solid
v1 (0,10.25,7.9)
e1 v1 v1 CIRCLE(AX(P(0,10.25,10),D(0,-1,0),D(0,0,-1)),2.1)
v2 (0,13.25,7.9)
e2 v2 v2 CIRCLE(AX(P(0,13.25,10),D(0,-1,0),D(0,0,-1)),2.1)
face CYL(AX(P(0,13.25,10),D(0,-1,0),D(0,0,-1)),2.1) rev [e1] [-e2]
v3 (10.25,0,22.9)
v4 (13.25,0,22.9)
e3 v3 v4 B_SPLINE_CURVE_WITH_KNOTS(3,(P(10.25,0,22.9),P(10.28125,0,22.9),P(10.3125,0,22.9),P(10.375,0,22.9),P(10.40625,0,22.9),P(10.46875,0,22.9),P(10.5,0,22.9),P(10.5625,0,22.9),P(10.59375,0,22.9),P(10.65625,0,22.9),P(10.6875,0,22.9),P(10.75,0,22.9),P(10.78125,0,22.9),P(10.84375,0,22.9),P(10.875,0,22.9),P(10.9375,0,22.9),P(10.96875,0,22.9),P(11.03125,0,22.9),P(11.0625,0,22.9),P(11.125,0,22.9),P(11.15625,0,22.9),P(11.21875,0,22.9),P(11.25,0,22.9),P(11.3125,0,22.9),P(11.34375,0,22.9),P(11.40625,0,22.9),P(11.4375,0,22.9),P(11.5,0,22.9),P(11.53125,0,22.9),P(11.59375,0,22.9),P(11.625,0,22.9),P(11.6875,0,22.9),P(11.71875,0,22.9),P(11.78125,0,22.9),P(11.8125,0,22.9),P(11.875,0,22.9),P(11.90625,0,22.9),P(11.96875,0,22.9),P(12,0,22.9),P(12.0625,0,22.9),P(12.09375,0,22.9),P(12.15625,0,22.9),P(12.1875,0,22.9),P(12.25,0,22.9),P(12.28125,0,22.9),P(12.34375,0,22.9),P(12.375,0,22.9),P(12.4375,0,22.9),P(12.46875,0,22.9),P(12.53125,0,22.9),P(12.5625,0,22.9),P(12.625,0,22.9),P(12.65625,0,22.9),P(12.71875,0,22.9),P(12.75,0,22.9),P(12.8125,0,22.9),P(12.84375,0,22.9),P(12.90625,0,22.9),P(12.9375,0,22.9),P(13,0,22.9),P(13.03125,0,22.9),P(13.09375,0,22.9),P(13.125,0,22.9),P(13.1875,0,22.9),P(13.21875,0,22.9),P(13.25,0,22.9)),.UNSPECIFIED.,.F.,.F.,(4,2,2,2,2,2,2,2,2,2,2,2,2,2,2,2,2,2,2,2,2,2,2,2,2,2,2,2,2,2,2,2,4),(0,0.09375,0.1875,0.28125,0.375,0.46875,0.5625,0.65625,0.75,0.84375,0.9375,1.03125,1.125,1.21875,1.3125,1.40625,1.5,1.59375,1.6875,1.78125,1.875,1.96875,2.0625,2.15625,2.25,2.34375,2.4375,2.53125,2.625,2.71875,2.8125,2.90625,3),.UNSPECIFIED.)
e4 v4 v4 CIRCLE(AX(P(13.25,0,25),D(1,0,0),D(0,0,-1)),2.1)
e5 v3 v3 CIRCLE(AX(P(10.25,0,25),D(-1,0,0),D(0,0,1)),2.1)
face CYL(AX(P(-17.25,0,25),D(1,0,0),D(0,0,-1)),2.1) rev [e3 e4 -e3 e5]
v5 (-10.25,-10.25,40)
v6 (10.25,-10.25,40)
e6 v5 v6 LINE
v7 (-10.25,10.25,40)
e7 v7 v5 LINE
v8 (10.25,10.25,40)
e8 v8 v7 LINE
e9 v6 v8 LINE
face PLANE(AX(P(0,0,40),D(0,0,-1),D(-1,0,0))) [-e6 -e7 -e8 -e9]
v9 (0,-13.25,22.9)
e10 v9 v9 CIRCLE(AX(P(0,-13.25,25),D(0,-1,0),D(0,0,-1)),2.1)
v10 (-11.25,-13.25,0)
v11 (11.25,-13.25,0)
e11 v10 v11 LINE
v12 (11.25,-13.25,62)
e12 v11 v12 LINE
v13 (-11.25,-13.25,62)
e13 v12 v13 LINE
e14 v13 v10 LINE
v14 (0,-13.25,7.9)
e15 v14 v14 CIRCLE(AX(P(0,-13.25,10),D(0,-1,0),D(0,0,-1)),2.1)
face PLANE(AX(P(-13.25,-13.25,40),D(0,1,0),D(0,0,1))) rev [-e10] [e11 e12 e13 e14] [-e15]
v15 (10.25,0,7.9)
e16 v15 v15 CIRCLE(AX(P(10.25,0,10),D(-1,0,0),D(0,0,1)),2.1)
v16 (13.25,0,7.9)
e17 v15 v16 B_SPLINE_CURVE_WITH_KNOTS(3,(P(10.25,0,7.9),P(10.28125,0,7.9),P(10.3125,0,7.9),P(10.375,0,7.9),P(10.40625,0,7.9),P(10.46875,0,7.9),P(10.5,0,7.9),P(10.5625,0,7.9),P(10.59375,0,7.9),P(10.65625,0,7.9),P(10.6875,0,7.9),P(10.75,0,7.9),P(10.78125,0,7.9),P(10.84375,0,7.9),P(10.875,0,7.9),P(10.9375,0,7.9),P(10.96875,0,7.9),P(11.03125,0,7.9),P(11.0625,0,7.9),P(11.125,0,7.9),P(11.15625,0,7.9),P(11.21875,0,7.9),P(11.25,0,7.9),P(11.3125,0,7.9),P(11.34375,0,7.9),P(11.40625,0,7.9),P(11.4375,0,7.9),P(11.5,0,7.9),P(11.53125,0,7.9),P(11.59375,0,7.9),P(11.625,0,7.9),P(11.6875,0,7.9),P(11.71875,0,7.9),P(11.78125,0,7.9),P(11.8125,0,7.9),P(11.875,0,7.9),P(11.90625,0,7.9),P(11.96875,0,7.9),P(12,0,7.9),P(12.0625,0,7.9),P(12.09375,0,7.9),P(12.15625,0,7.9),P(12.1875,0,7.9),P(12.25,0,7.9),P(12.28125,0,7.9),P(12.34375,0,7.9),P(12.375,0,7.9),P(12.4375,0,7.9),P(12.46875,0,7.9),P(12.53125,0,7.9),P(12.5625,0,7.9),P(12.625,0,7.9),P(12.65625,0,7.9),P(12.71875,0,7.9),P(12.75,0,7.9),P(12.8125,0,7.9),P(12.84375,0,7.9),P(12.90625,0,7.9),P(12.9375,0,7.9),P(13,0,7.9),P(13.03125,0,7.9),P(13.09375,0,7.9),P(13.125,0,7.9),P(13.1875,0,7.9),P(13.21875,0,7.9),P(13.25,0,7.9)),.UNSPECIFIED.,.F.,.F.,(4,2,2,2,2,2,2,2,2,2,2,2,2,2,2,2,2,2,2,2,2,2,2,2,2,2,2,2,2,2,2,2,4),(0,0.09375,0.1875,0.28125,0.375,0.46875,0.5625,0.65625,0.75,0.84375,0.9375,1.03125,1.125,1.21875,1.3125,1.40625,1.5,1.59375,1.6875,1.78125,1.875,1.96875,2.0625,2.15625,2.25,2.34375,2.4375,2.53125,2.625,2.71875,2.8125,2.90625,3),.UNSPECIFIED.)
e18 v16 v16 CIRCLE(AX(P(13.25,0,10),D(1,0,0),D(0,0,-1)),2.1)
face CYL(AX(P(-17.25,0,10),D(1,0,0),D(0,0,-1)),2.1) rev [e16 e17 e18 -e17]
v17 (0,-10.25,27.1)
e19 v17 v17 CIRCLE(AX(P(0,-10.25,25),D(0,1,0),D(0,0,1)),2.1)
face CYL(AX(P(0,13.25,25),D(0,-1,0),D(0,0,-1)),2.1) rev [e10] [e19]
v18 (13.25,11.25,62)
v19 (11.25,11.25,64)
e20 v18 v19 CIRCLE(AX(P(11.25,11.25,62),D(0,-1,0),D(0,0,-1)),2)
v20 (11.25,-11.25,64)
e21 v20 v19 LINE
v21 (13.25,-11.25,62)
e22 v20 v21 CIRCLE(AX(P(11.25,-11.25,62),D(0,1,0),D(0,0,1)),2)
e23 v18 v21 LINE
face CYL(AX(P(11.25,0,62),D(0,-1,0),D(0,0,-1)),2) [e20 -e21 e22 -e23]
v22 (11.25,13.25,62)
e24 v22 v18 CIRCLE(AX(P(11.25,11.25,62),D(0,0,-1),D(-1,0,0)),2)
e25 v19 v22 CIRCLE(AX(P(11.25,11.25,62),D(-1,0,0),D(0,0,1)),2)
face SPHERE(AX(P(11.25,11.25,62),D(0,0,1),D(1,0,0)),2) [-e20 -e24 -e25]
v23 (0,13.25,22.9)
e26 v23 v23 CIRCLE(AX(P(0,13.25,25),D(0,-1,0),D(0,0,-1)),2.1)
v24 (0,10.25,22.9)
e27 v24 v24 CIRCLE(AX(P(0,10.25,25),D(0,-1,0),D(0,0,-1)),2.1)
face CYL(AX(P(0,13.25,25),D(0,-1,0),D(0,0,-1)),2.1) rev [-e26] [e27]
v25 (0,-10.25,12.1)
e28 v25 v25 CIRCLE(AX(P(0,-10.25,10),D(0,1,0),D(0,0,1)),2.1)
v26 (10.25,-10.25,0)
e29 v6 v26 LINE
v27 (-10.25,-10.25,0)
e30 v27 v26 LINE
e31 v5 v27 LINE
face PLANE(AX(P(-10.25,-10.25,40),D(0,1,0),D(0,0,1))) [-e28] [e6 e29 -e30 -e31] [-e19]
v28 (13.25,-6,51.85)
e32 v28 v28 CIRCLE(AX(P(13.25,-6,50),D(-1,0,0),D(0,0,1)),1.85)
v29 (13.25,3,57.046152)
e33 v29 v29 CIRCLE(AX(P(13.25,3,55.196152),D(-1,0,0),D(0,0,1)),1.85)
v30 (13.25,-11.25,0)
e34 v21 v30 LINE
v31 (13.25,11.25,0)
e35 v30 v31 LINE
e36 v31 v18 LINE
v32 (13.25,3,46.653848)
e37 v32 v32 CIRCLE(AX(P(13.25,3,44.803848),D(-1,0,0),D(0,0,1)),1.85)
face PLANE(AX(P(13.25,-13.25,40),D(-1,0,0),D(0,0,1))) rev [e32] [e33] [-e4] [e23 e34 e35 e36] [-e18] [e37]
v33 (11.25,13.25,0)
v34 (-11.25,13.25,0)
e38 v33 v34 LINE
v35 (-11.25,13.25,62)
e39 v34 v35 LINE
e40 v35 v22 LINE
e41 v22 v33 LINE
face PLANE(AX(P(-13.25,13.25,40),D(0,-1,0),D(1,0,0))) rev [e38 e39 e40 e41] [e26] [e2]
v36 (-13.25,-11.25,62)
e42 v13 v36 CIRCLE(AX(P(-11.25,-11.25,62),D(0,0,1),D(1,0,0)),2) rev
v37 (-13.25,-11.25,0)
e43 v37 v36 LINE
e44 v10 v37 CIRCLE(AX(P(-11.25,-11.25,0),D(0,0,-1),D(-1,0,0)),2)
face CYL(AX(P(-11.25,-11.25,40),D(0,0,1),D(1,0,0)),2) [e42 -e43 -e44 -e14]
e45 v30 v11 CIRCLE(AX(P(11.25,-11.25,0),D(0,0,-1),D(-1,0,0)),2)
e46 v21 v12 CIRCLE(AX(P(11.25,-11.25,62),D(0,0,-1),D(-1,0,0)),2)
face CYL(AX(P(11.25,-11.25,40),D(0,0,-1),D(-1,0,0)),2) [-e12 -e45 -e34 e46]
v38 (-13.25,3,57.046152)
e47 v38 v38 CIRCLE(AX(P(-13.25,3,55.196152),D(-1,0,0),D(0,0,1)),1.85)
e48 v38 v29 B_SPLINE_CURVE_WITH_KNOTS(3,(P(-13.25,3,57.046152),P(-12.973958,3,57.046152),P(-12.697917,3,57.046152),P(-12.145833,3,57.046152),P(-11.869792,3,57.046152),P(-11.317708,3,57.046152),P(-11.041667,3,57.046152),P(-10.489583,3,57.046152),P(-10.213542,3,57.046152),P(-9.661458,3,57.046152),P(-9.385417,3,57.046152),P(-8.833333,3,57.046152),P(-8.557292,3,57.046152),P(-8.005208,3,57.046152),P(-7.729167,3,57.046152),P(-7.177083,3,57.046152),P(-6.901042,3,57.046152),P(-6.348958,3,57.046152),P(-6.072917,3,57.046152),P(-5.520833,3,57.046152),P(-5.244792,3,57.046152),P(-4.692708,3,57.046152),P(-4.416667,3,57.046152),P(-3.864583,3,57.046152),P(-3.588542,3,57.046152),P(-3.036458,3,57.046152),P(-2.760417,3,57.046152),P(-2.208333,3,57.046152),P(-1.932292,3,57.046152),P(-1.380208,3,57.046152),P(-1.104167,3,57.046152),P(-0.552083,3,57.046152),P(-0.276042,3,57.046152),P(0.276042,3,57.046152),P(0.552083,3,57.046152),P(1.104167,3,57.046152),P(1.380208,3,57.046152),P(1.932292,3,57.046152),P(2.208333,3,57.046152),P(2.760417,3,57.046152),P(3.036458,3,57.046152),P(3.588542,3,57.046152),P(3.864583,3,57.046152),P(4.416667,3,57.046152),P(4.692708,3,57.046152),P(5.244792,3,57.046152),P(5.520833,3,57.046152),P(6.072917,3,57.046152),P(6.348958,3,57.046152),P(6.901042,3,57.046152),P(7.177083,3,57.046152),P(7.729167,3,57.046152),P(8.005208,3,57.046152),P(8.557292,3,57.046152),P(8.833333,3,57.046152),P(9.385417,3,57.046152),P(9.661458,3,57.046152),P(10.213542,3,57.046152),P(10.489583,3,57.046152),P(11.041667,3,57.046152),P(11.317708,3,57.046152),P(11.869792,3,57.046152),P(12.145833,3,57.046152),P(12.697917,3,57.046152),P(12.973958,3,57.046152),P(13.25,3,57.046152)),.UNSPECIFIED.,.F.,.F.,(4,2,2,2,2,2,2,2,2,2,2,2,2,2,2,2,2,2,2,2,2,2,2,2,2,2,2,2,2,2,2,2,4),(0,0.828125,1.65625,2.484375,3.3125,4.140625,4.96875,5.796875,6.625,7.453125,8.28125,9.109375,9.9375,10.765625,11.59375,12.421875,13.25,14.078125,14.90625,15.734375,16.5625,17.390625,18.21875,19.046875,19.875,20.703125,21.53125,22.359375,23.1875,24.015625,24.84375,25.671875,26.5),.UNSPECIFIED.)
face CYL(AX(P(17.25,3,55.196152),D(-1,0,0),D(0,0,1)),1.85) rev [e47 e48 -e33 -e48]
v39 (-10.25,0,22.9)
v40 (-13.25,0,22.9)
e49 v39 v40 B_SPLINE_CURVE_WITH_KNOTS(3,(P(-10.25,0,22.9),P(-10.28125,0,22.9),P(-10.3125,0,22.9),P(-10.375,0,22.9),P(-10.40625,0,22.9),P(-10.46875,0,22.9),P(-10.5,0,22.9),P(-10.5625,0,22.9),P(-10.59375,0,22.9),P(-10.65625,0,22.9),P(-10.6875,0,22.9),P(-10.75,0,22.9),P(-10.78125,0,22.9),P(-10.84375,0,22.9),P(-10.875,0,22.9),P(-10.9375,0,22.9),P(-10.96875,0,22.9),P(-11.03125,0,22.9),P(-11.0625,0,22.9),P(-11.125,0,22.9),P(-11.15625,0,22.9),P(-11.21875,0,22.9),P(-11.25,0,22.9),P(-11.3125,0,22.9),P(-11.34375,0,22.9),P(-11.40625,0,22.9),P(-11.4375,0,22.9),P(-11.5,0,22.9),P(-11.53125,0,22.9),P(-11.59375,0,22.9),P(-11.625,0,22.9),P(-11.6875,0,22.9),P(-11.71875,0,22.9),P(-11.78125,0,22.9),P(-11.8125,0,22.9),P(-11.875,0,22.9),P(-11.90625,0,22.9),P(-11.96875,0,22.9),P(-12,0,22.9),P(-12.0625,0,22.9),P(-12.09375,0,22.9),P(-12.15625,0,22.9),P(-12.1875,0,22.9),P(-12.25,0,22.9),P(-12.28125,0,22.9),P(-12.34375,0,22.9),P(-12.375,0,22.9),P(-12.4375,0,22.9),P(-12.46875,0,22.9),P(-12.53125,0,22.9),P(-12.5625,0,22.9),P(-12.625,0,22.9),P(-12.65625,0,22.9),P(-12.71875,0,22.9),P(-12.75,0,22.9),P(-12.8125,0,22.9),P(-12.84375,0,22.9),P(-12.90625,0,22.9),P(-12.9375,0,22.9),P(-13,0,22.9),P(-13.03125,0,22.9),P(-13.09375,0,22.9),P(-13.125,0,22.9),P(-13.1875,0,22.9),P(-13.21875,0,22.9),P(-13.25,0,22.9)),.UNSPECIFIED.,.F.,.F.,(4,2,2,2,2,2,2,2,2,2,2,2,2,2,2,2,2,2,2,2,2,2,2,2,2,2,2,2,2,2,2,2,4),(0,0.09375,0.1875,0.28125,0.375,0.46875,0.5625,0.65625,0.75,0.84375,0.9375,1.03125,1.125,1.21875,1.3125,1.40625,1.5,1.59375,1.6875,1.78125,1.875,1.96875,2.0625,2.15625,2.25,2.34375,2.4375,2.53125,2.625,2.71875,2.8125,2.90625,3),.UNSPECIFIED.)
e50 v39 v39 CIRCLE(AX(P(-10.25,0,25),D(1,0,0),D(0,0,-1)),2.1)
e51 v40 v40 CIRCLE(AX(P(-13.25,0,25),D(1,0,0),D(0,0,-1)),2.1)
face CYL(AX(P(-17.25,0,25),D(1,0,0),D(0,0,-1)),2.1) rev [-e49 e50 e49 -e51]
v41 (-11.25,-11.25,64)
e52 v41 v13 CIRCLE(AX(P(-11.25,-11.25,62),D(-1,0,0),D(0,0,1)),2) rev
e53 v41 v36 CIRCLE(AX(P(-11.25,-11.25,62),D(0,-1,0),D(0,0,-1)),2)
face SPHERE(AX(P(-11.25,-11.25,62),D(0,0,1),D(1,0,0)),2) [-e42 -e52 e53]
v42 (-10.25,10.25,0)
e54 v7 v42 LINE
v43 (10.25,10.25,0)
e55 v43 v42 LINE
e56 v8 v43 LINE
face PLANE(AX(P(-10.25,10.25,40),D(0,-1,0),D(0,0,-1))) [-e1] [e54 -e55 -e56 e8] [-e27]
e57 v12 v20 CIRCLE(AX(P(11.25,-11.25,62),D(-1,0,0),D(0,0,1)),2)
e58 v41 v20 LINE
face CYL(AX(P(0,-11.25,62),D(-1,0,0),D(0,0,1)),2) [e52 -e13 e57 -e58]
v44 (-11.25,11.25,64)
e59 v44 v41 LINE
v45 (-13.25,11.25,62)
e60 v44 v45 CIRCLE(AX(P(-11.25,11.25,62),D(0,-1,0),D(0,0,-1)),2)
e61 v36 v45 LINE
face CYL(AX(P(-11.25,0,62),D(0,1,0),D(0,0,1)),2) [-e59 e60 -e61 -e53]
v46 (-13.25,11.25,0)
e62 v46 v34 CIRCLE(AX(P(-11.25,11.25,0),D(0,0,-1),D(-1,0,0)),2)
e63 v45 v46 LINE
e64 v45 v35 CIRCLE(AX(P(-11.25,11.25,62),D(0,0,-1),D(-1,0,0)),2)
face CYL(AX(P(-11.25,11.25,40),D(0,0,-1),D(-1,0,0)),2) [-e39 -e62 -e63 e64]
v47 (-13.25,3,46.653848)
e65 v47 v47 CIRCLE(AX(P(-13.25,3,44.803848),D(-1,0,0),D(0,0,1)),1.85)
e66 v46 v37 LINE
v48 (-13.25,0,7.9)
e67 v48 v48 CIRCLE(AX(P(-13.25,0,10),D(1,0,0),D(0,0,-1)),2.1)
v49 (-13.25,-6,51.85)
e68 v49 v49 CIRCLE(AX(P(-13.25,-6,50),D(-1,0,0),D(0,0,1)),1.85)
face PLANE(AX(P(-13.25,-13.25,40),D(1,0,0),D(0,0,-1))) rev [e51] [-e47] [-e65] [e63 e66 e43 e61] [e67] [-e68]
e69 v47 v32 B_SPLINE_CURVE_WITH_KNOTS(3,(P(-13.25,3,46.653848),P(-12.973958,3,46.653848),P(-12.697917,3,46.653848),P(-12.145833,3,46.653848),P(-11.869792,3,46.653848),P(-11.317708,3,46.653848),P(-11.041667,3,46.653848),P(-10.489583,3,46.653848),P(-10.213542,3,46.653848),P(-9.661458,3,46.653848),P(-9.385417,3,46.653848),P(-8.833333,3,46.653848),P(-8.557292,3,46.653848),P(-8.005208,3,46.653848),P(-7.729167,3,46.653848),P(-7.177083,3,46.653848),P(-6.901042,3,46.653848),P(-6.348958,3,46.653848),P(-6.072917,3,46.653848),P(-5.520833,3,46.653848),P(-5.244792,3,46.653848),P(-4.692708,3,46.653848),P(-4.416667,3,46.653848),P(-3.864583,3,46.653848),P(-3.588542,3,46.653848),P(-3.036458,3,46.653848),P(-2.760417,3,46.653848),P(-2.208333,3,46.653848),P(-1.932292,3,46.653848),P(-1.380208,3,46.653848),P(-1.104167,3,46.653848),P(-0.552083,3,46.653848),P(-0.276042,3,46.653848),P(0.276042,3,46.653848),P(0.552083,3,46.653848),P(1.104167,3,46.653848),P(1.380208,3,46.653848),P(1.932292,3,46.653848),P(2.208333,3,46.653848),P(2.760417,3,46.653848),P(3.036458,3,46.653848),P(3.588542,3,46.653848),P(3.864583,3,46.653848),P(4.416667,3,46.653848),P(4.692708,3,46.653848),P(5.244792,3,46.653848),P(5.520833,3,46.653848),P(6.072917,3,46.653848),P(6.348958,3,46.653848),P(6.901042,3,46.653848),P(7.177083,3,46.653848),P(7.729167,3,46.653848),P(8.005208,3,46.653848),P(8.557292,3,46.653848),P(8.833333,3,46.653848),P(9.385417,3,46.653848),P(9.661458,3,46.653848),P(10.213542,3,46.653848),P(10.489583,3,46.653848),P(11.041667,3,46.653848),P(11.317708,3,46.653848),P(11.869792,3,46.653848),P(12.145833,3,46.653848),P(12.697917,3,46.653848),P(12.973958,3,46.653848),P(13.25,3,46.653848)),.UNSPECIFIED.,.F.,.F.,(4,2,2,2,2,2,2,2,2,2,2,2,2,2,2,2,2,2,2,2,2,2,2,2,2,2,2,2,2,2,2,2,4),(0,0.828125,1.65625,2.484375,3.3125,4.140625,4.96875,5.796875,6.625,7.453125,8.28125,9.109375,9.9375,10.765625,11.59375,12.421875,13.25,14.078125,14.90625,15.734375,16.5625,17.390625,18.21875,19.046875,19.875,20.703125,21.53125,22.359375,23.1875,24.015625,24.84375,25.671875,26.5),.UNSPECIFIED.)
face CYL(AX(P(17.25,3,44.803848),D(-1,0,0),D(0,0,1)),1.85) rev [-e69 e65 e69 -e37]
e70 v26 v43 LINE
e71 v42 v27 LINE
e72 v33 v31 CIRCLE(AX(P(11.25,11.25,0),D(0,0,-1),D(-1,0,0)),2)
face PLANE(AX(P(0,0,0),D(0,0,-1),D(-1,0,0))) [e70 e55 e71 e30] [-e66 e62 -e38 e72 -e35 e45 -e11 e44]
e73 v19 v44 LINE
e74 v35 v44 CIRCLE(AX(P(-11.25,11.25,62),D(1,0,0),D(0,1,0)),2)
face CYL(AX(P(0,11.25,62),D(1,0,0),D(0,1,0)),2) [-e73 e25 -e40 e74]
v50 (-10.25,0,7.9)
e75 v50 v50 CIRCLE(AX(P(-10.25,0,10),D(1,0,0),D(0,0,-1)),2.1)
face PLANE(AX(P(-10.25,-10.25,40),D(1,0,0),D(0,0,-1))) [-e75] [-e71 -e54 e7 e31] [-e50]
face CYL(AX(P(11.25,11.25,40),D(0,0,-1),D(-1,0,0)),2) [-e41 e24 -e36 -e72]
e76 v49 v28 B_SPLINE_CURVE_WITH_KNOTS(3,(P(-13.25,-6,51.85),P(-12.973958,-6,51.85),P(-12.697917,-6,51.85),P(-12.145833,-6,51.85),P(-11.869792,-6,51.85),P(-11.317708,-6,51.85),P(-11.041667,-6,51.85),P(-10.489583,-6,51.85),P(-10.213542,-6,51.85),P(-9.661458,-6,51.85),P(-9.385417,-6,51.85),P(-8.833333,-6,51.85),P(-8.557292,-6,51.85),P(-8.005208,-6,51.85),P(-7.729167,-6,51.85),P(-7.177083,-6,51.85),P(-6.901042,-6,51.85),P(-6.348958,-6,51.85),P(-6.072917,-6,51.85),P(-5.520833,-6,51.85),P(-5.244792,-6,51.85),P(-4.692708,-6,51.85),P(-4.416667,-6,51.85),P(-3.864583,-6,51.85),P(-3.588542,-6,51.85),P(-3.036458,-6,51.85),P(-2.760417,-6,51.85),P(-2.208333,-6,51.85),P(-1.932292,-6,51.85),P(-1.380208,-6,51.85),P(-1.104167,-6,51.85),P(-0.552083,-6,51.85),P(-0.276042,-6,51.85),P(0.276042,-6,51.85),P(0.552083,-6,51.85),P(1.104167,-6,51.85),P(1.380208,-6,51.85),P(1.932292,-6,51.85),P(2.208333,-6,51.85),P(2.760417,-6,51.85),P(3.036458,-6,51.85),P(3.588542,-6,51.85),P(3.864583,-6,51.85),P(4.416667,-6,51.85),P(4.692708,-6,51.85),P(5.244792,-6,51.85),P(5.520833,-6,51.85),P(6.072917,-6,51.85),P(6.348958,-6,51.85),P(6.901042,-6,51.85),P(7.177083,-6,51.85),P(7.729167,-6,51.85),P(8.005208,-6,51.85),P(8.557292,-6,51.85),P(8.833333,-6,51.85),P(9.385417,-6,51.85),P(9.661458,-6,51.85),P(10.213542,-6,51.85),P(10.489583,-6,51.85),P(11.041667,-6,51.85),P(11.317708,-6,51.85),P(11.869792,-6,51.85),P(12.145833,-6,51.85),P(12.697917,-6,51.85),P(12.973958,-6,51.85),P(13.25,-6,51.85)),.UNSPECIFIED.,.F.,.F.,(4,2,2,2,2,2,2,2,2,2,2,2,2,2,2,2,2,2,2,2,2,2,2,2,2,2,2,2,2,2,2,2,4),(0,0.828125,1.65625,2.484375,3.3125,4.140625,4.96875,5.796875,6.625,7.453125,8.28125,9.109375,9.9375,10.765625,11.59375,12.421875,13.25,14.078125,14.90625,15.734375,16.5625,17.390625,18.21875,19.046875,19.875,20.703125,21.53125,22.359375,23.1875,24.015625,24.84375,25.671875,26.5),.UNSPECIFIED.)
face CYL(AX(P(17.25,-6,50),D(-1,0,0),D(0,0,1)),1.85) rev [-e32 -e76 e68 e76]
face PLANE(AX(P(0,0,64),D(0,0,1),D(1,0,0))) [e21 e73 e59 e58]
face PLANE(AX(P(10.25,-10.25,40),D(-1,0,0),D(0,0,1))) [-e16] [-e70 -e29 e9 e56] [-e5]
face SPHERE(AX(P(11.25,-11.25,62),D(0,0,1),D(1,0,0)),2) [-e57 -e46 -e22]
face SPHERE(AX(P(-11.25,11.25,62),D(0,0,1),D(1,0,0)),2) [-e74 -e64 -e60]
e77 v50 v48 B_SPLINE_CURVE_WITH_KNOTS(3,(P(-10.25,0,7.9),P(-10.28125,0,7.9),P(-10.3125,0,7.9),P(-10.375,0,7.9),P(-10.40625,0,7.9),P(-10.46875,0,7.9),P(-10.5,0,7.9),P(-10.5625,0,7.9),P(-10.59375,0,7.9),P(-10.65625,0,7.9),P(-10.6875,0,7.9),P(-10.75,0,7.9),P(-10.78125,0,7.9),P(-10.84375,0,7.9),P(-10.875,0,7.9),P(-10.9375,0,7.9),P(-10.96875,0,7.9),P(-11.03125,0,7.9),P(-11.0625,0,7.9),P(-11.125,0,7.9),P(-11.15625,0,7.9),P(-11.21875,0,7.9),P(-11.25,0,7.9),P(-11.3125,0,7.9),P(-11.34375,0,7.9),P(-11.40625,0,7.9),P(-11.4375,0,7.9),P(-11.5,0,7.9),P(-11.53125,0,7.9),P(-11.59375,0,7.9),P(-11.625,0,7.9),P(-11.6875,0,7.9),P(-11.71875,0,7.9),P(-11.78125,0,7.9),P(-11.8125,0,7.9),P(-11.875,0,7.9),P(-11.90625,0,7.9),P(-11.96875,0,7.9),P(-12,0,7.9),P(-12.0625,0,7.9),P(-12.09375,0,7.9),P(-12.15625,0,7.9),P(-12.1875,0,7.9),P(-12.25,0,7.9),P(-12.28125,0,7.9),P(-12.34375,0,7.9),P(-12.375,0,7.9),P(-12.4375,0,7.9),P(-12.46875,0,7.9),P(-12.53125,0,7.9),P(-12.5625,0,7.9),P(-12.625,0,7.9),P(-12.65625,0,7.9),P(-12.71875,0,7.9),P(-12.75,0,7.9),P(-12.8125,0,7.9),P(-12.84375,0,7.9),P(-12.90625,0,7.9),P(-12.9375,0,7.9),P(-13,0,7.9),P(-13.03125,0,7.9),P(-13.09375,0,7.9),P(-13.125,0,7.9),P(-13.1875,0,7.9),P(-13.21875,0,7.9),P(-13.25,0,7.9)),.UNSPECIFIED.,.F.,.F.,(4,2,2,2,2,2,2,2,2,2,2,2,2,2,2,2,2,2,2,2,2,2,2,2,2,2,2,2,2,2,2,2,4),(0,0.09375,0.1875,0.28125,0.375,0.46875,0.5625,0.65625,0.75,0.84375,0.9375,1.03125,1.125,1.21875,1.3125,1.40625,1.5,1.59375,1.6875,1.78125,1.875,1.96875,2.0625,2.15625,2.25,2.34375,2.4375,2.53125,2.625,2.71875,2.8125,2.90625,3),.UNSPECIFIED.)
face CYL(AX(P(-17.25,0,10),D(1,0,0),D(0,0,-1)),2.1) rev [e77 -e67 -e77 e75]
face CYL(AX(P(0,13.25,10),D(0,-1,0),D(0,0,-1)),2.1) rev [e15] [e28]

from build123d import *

# Parameters (mm, degrees)
SKETCH_1_W           = 26.5
SKETCH_1_H           = 26.5
SKETCH_1_W_2         = 20.5
SKETCH_1_H_2         = 20.5
EXTRUDE_1_DEPTH      = 40
SKETCH_3_W           = 26.5
SKETCH_3_H           = 26.5
EXTRUDE_2_DEPTH      = 20
SKETCH_9_W           = 26.5
SKETCH_9_H           = 26.5
EXTRUDE_5_DEPTH      = 4
SKETCH_10_R          = 12
SKETCH_10_R_2        = 10
EXTRUDE_7_DEPTH      = 4
EXTRUDE_START        = 4
SKETCH_12_R          = 12
SKETCH_12_R_2        = 10
EXTRUDE_8_DEPTH      = 4
SKETCH_13_R          = 1.85
CUT_EXTRUDE_3_DEPTH  = 73.123591841
SKETCH_15_R          = 2.1
CUT_EXTRUDE_5_DEPTH  = 73.123591841
SKETCH_14_R          = 2.1
CUT_EXTRUDE_6_DEPTH  = 72.384959901
SKETCH_18_R          = 12
CUT_EXTRUDE_9_DEPTH  = 4
CUT_EXTRUDE_START    = 4
SKETCH_19_R          = 12
CUT_EXTRUDE_11_DEPTH = 4
FILLET_6_R           = 2
FILLET_7_R           = 2
FILLET_8_R           = 2
FILLET_9_R           = 2


with BuildPart() as part:
    # 草图1 → 凸台-拉伸1 (new body)
    with BuildSketch(Plane.XY):
        Rectangle(SKETCH_1_W, SKETCH_1_H)
        Rectangle(SKETCH_1_W_2, SKETCH_1_H_2, mode=Mode.SUBTRACT)
    extrude(amount=EXTRUDE_1_DEPTH)

    # 草图3 → 凸台-拉伸2 (add)
    with BuildSketch(Plane.XY.offset(40)):
        Rectangle(SKETCH_3_W, SKETCH_3_H)
    extrude(amount=EXTRUDE_2_DEPTH)

    # 草图9 → 凸台-拉伸5 (add)
    with BuildSketch(Plane.XY.offset(60)):
        Rectangle(SKETCH_9_W, SKETCH_9_H)
    extrude(amount=EXTRUDE_5_DEPTH)

    # 草图10 → 凸台-拉伸7 (add)
    with BuildSketch(Plane(origin=(13.25, 0, 0), x_dir=(0, 0, -1), z_dir=(1, 0, 0))):
        with Locations(Location((-50, 0, 0), (0, 0, 180))):
            Circle(SKETCH_10_R)
        with Locations((-50, 0)):
            Circle(SKETCH_10_R_2, mode=Mode.SUBTRACT)
    extrude(amount=EXTRUDE_7_DEPTH)

    # 草图12 → 凸台-拉伸8 (add)
    with BuildSketch(Plane.ZY.offset(13.25).offset(EXTRUDE_START)):
        with Locations((50, 0)):
            Circle(SKETCH_12_R)
        with Locations(Location((50, 0, 0), (0, 0, 180))):
            Circle(SKETCH_12_R_2, mode=Mode.SUBTRACT)
    extrude(amount=-EXTRUDE_8_DEPTH)

    # 草图13 → 切除-拉伸3 (cut, through all)
    with BuildSketch(Plane.ZY.offset(13.25)):
        with Locations((55.196152423, 3)):
            Circle(SKETCH_13_R)
        with Locations((50, -6)):
            Circle(SKETCH_13_R)
        with Locations((44.803847577, 3)):
            Circle(SKETCH_13_R)
    extrude(amount=-CUT_EXTRUDE_3_DEPTH, mode=Mode.SUBTRACT)

    # 草图15 → 切除-拉伸5 (cut, through all)
    with BuildSketch(Plane(origin=(13.25, 0, 0), x_dir=(0, 0, -1), z_dir=(1, 0, 0))):
        with Locations((-10, 0)):
            Circle(SKETCH_15_R)
        with Locations((-25, 0)):
            Circle(SKETCH_15_R)
    extrude(amount=-CUT_EXTRUDE_5_DEPTH, mode=Mode.SUBTRACT)

    # 草图14 → 切除-拉伸6 (cut, through all)
    with BuildSketch(Plane.XZ.offset(13.25)):
        with Locations(Location((0, 10, 0), (0, 0, 270))):
            Circle(SKETCH_14_R)
        with Locations(Location((0, 25, 0), (0, 0, 270))):
            Circle(SKETCH_14_R)
    extrude(amount=-CUT_EXTRUDE_6_DEPTH, mode=Mode.SUBTRACT)

    # 草图18 → 切除-拉伸9 (cut)
    with BuildSketch(Plane(origin=(13.25, 0, 0), x_dir=(0, 0, -1), z_dir=(1, 0, 0))):
        with Locations((-50, 0)):
            Circle(SKETCH_18_R)
    extrude(amount=CUT_EXTRUDE_9_DEPTH, mode=Mode.SUBTRACT)

    # 草图19 → 切除-拉伸11 (cut)
    with BuildSketch(Plane.ZY.offset(13.25).offset(CUT_EXTRUDE_START)):
        with Locations((50, 0)):
            Circle(SKETCH_19_R)
    extrude(amount=-CUT_EXTRUDE_11_DEPTH, mode=Mode.SUBTRACT)

    # 圆角6
    fillet_6_edges = [part.edges().sort_by_distance(p)[0] for p in [
        (0, -13.25, 64),
        (13.25, -13.25, 32),
        (-13.25, -13.25, 32),
    ]]
    fillet(fillet_6_edges, radius=FILLET_6_R)

    # 圆角7
    # the kernel refuses this fillet: 2 mm, written as the material it takes off along each edge
    with BuildSketch(Plane(origin=(11.25, -11.25, 62), x_dir=(1, 0, 0), z_dir=(0, 0, 1))) as fillet_7_piece_1_section:
        Polygon((0, 0), (FILLET_7_R, 0), (FILLET_7_R, -FILLET_7_R), (0, -FILLET_7_R), align=None)
    fillet_7_piece_1 = extrude(amount=FILLET_7_R, mode=Mode.PRIVATE)
    fillet_7_piece_1 = fillet_7_piece_1 - Plane(origin=(11.25, -11.25, 62), x_dir=(-0.7071067811865475, 0.7071067811865475, 0), z_dir=(0, 0, 1)) * Sphere(FILLET_7_R, mode=Mode.PRIVATE)
    add(fillet_7_piece_1, mode=Mode.SUBTRACT)
    with BuildSketch(Plane(origin=(13.25, 18.25, 64), x_dir=(-1, 0, 0), z_dir=(0, -1, 0))) as fillet_7_piece_2:
        with BuildLine():
            CenterArc((FILLET_7_R, FILLET_7_R), FILLET_7_R, 180, 90)
            Line((0, FILLET_7_R), (0, 0))
            Line((0, 0), (FILLET_7_R, 0))
        make_face()
    extrude(amount=29.5, mode=Mode.SUBTRACT)
    with BuildSketch(Plane(origin=(13.25, 13.25, 69), x_dir=(-1, 0, 0), z_dir=(0, 0, -1))) as fillet_7_piece_3:
        with BuildLine():
            CenterArc((FILLET_7_R, -FILLET_7_R), FILLET_7_R, 90, 90)
            Line((0, -FILLET_7_R), (0, 0))
            Line((0, 0), (FILLET_7_R, 0))
        make_face()
    extrude(amount=74, mode=Mode.SUBTRACT)

    # 圆角8
    # the kernel refuses this fillet: 2 mm, written as the material it takes off along each edge
    with BuildSketch(Plane(origin=(11.25, 11.25, 62), x_dir=(0, 1, 0), z_dir=(0, 0, 1))) as fillet_8_piece_1_section:
        Polygon((0, 0), (FILLET_8_R, 0), (FILLET_8_R, -FILLET_8_R), (0, -FILLET_8_R), align=None)
    fillet_8_piece_1 = extrude(amount=FILLET_8_R, mode=Mode.PRIVATE)
    fillet_8_piece_1 = fillet_8_piece_1 - Plane(origin=(11.25, 11.25, 62), x_dir=(-0.7071067811865475, -0.7071067811865475, 0), z_dir=(0, 0, 1)) * Sphere(FILLET_8_R, mode=Mode.PRIVATE)
    add(fillet_8_piece_1, mode=Mode.SUBTRACT)
    with BuildSketch(Plane(origin=(-18.25, 13.25, 64), x_dir=(0, -1, 0), z_dir=(1, 0, 0))) as fillet_8_piece_2:
        with BuildLine():
            CenterArc((FILLET_8_R, FILLET_8_R), FILLET_8_R, 180, 90)
            Line((0, FILLET_8_R), (0, 0))
            Line((0, 0), (FILLET_8_R, 0))
        make_face()
    extrude(amount=29.5, mode=Mode.SUBTRACT)
    with BuildSketch(Plane(origin=(-13.25, 13.25, -5), x_dir=(0, -1, 0), z_dir=(0, 0, 1))) as fillet_8_piece_3:
        with BuildLine():
            CenterArc((FILLET_8_R, FILLET_8_R), FILLET_8_R, 180, 90)
            Line((0, FILLET_8_R), (0, 0))
            Line((0, 0), (FILLET_8_R, 0))
        make_face()
    extrude(amount=74, mode=Mode.SUBTRACT)

    # 圆角9
    # the kernel refuses this fillet: 2 mm, written as the material it takes off along each edge
    with BuildSketch(Plane(origin=(-11.25, -11.25, 62), x_dir=(0, 0, 1), z_dir=(-1, 0, 0))) as fillet_9_piece_1_section:
        Polygon((0, 0), (FILLET_9_R, 0), (FILLET_9_R, -FILLET_9_R), (0, -FILLET_9_R), align=None)
    fillet_9_piece_1 = extrude(amount=FILLET_9_R, mode=Mode.PRIVATE)
    fillet_9_piece_1 = fillet_9_piece_1 - Plane(origin=(-11.25, -11.25, 62), x_dir=(0, 0.7071067811865475, -0.7071067811865475), z_dir=(-1, 0, 0)) * Sphere(FILLET_9_R, mode=Mode.PRIVATE)
    add(fillet_9_piece_1, mode=Mode.SUBTRACT)
    with BuildSketch(Plane(origin=(-11.25, 11.25, 62), x_dir=(0, 0, 1), z_dir=(-1, 0, 0))) as fillet_9_piece_2_section:
        Polygon((0, 0), (FILLET_9_R, 0), (FILLET_9_R, FILLET_9_R), (0, FILLET_9_R), align=None)
    fillet_9_piece_2 = extrude(amount=FILLET_9_R, mode=Mode.PRIVATE)
    fillet_9_piece_2 = fillet_9_piece_2 - Plane(origin=(-11.25, 11.25, 62), x_dir=(0, -0.7071067811865475, -0.7071067811865475), z_dir=(-1, 0, 0)) * Sphere(FILLET_9_R, mode=Mode.PRIVATE)
    add(fillet_9_piece_2, mode=Mode.SUBTRACT)
    with BuildSketch(Plane(origin=(-13.25, -11.25, 64), x_dir=(0, 0, -1), z_dir=(0, 1, 0))) as fillet_9_piece_3:
        with BuildLine():
            CenterArc((FILLET_9_R, -FILLET_9_R), FILLET_9_R, 90, 90)
            Line((0, -FILLET_9_R), (0, 0))
            Line((0, 0), (FILLET_9_R, 0))
        make_face()
    extrude(amount=22.5, mode=Mode.SUBTRACT)


solid = part.part
